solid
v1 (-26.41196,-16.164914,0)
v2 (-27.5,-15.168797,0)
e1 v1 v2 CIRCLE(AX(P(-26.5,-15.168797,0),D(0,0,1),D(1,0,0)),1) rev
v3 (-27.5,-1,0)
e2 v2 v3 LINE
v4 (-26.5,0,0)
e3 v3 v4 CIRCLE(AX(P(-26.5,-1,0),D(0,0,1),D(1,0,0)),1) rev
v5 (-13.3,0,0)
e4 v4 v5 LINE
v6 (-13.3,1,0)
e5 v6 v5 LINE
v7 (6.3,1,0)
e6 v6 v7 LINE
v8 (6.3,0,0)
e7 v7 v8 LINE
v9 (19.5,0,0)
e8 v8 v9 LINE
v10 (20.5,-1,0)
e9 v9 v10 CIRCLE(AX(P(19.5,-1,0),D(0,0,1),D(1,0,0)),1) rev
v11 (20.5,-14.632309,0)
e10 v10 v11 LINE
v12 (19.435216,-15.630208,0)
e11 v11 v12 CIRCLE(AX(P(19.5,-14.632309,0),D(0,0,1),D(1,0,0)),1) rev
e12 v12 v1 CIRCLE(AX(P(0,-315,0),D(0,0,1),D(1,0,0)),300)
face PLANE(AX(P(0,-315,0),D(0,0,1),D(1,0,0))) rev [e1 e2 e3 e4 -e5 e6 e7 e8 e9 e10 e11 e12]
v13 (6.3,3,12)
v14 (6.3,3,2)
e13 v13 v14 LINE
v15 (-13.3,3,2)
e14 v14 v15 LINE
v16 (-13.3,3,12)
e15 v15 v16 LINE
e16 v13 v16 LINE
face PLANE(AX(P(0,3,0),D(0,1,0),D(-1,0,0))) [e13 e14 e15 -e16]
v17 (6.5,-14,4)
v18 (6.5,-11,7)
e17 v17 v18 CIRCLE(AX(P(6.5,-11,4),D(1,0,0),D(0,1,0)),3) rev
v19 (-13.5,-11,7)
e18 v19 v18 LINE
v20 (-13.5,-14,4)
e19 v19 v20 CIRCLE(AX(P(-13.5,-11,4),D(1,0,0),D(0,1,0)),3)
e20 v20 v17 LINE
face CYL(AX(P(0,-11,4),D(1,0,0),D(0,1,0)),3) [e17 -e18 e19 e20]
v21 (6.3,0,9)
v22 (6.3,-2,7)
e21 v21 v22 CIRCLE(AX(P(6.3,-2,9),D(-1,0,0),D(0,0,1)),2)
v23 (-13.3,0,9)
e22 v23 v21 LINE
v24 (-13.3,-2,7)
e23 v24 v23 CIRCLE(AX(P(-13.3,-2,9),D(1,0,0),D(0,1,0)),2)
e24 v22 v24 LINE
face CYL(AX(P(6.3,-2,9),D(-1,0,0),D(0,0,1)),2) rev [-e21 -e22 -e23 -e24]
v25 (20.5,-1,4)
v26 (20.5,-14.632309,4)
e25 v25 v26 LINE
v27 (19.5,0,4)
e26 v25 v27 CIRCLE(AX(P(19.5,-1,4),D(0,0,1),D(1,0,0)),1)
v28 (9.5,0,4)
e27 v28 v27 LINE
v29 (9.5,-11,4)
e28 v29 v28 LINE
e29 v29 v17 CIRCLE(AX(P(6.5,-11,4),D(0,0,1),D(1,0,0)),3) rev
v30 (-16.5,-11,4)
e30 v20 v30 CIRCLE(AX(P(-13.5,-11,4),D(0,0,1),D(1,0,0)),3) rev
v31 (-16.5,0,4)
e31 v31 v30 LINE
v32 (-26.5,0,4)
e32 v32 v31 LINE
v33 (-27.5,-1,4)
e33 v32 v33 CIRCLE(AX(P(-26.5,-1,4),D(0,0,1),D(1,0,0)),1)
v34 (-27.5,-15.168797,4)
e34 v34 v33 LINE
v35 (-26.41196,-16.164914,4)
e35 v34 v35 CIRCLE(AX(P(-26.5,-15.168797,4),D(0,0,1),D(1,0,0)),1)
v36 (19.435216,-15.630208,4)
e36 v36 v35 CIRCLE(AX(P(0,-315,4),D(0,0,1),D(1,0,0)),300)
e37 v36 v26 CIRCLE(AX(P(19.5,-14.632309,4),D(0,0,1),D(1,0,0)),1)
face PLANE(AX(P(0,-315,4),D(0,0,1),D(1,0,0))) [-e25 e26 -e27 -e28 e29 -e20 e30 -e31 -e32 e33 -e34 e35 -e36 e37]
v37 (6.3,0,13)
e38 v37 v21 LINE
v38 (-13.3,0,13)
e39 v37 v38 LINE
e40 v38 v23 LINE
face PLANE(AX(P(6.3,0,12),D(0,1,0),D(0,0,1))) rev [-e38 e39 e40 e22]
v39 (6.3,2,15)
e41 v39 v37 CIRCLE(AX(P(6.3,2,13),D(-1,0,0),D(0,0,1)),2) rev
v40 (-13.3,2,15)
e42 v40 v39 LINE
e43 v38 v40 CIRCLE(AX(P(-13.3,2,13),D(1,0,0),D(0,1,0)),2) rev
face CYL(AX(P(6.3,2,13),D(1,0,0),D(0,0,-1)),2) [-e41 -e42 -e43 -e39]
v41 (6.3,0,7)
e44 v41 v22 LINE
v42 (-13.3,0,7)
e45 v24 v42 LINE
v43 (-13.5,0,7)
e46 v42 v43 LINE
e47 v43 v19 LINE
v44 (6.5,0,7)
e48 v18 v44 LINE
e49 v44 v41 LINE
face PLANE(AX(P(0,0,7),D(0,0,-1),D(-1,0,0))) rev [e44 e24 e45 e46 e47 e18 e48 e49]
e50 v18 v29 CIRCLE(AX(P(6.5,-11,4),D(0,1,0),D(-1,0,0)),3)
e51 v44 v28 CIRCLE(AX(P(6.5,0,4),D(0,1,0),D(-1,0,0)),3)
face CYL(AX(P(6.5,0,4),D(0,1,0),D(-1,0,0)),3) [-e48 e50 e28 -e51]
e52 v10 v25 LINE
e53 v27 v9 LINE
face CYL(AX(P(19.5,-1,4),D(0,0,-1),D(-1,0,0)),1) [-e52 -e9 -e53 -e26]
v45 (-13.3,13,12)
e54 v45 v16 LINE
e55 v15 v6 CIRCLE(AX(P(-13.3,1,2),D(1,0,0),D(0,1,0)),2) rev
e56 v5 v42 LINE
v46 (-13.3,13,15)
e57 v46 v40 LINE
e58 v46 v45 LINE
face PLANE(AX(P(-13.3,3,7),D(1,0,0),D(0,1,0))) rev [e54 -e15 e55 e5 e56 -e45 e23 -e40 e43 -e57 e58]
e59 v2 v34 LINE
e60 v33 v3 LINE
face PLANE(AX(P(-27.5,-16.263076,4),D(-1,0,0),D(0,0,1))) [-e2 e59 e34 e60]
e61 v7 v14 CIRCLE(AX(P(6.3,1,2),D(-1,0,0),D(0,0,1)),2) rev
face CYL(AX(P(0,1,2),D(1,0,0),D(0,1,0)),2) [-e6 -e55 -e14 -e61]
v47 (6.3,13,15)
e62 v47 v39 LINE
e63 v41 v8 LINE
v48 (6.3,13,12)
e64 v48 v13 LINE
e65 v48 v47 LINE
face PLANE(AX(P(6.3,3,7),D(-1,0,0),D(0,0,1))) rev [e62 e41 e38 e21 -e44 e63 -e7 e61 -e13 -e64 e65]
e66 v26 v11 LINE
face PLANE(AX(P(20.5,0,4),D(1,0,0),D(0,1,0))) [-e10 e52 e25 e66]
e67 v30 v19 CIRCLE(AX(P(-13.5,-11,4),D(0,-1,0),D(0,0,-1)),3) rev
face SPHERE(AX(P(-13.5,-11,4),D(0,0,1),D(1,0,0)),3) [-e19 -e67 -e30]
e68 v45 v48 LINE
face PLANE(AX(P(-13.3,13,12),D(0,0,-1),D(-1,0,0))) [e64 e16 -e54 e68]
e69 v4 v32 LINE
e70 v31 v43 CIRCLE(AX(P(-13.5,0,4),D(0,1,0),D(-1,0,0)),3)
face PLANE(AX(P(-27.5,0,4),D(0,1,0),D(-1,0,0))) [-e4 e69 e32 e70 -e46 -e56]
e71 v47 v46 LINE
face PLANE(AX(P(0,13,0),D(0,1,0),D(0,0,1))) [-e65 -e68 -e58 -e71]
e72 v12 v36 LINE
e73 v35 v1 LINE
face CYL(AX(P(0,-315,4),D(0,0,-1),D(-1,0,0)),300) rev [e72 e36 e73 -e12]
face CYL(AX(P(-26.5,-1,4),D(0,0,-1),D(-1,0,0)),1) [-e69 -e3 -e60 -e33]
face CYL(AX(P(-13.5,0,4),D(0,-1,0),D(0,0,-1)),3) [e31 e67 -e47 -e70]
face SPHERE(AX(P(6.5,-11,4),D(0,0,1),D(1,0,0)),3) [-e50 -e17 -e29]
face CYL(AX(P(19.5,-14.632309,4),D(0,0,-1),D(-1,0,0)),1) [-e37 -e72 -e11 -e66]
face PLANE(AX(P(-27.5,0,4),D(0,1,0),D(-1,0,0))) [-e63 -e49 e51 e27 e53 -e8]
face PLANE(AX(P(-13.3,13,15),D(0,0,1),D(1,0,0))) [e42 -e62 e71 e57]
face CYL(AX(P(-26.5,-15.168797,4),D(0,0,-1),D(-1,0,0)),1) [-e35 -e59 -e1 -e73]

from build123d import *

# Parameters (mm, degrees)
BOSS_EXTRUDE1_DEPTH = 4
SKETCH4_W           = 26
SKETCH4_H           = 14
BOSS_EXTRUDE2_DEPTH = 3
FILLET1_R           = 1
FILLET3_R           = 3
FILLET4_R           = 3
SKETCH5_W           = 19.6
SKETCH5_H           = 7
BOSS_EXTRUDE3_DEPTH = 3
SKETCH8_W           = 19.6
SKETCH8_H           = 3
BOSS_EXTRUDE5_DEPTH = 5
SKETCH9_W           = 19.6
SKETCH9_H           = 3
BOSS_EXTRUDE6_DEPTH = 13
FILLET5_R           = 2


# Some blends are built 0.0001 mm under size
with BuildPart() as part:
    # Sketch1 → Boss-Extrude1 (new body)
    with BuildSketch(Plane(origin=(0, 0, 0), x_dir=(-1, 0, 0), z_dir=(0, 0, -1))):
        with BuildLine():
            Line((27.500000074, -16.263075607), (27.500000074, 0))
            Line((27.500000074, 0), (-20.499999926, 0))
            Line((-20.499999926, 0), (-20.499999926, -15.701236215))
            ThreePointArc((-20.499999926, -15.701236215), (3.511255672, -15.020548898), (27.500000074, -16.263075607))
        make_face()
    extrude(amount=-BOSS_EXTRUDE1_DEPTH)

    # Sketch4 → Boss-Extrude2 (add)
    with BuildSketch(Plane.XY.offset(4)):
        with Locations((-3.500000074, -7)):
            Rectangle(SKETCH4_W, SKETCH4_H)
    extrude(amount=BOSS_EXTRUDE2_DEPTH)

    # Fillet1
    fillet1_edges = [part.edges().sort_by_distance(p)[0] for p in [
        (20.499999926, 0, 2),
        (-27.500000074, 0, 2),
        (20.499999926, -15.701236215, 2),
        (-27.500000074, -16.263075607, 2),
    ]]
    fillet(fillet1_edges, radius=FILLET1_R)

    # Fillet3
    fillet3_edges = [part.edges().sort_by_distance(p)[0] for p in [
        (-3.500000074, -14, 7),
        (-16.500000074, -7, 7),
        (9.499999926, -7, 7),
    ]]
    fillet(fillet3_edges, radius=FILLET3_R - 0.0001)  # a hair under: the kernel refuses the full size

    # Fillet4
    # the kernel refuses this fillet: 3 mm, written as the material it takes off along each edge
    with BuildSketch(Plane(origin=(-13.500000074, -11, 7), x_dir=(-1, 0, 0), z_dir=(0, 1, 0))) as fillet4_piece_1:
        with BuildLine():
            CenterArc((0.0001, -2.9999), 2.9999, 0, 90)
            Line((3, -2.9999), (3, 0))
            Line((3, 0), (0.0001, 0))
        make_face()
    revolve(axis=Axis((-13.500000074, -11, 7), (0, 0, 1)), revolution_arc=90, mode=Mode.SUBTRACT)
    with BuildSketch(Plane(origin=(6.499999926, -11, 7), x_dir=(0, -1, 0), z_dir=(-1, 0, 0))) as fillet4_piece_2:
        with BuildLine():
            CenterArc((0.0001, -2.9999), 2.9999, 0, 90)
            Line((3, -2.9999), (3, 0))
            Line((3, 0), (0.0001, 0))
        make_face()
    revolve(axis=Axis((6.499999926, -11, 7), (0, 0, 1)), revolution_arc=90, mode=Mode.SUBTRACT)
    with BuildSketch(Plane(origin=(9.499999926, -14, 4), x_dir=(0, 1, 0), z_dir=(0, 0, 1))) as fillet4_piece_3:
        with BuildLine():
            CenterArc((FILLET4_R, FILLET4_R), FILLET4_R, 180, 90)
            Line((0, FILLET4_R), (0, 0))
            Line((0, 0), (FILLET4_R, 0))
        make_face()
    extrude(amount=3, mode=Mode.SUBTRACT)
    with BuildSketch(Plane(origin=(-16.500000074, -14, 4), x_dir=(0, 1, 0), z_dir=(0, 0, 1))) as fillet4_piece_4:
        with BuildLine():
            CenterArc((FILLET4_R, -FILLET4_R), FILLET4_R, 90, 90)
            Line((0, -FILLET4_R), (0, 0))
            Line((0, 0), (FILLET4_R, 0))
        make_face()
    extrude(amount=3, mode=Mode.SUBTRACT)

    # Sketch5 → Boss-Extrude3 (add)
    with BuildSketch(Plane(origin=(0, 0, 0), x_dir=(1, 0, 0), z_dir=(0, 1, 0))):
        with Locations((-3.500000074, -3.5)):
            Rectangle(SKETCH5_W, SKETCH5_H)
    extrude(amount=BOSS_EXTRUDE3_DEPTH)

    # Sketch8 → Boss-Extrude5 (add)
    with BuildSketch(Plane.XY.offset(7)):
        with Locations((-3.500000074, 1.5)):
            Rectangle(SKETCH8_W, SKETCH8_H)
    extrude(amount=BOSS_EXTRUDE5_DEPTH)

    # Sketch9 → Boss-Extrude6 (add)
    with BuildSketch(Plane.XZ):
        with Locations((-3.500000074, 13.5)):
            Rectangle(SKETCH9_W, SKETCH9_H)
    extrude(amount=-BOSS_EXTRUDE6_DEPTH)

    # Fillet5
    fillet5_edges = [part.edges().sort_by_distance(p)[0] for p in [
        (-3.500000074, 0, 15),
        (-3.500000074, 3, 0),
        (-3.500000074, 0, 7),
    ]]
    fillet(fillet5_edges, radius=FILLET5_R)


solid = part.part
